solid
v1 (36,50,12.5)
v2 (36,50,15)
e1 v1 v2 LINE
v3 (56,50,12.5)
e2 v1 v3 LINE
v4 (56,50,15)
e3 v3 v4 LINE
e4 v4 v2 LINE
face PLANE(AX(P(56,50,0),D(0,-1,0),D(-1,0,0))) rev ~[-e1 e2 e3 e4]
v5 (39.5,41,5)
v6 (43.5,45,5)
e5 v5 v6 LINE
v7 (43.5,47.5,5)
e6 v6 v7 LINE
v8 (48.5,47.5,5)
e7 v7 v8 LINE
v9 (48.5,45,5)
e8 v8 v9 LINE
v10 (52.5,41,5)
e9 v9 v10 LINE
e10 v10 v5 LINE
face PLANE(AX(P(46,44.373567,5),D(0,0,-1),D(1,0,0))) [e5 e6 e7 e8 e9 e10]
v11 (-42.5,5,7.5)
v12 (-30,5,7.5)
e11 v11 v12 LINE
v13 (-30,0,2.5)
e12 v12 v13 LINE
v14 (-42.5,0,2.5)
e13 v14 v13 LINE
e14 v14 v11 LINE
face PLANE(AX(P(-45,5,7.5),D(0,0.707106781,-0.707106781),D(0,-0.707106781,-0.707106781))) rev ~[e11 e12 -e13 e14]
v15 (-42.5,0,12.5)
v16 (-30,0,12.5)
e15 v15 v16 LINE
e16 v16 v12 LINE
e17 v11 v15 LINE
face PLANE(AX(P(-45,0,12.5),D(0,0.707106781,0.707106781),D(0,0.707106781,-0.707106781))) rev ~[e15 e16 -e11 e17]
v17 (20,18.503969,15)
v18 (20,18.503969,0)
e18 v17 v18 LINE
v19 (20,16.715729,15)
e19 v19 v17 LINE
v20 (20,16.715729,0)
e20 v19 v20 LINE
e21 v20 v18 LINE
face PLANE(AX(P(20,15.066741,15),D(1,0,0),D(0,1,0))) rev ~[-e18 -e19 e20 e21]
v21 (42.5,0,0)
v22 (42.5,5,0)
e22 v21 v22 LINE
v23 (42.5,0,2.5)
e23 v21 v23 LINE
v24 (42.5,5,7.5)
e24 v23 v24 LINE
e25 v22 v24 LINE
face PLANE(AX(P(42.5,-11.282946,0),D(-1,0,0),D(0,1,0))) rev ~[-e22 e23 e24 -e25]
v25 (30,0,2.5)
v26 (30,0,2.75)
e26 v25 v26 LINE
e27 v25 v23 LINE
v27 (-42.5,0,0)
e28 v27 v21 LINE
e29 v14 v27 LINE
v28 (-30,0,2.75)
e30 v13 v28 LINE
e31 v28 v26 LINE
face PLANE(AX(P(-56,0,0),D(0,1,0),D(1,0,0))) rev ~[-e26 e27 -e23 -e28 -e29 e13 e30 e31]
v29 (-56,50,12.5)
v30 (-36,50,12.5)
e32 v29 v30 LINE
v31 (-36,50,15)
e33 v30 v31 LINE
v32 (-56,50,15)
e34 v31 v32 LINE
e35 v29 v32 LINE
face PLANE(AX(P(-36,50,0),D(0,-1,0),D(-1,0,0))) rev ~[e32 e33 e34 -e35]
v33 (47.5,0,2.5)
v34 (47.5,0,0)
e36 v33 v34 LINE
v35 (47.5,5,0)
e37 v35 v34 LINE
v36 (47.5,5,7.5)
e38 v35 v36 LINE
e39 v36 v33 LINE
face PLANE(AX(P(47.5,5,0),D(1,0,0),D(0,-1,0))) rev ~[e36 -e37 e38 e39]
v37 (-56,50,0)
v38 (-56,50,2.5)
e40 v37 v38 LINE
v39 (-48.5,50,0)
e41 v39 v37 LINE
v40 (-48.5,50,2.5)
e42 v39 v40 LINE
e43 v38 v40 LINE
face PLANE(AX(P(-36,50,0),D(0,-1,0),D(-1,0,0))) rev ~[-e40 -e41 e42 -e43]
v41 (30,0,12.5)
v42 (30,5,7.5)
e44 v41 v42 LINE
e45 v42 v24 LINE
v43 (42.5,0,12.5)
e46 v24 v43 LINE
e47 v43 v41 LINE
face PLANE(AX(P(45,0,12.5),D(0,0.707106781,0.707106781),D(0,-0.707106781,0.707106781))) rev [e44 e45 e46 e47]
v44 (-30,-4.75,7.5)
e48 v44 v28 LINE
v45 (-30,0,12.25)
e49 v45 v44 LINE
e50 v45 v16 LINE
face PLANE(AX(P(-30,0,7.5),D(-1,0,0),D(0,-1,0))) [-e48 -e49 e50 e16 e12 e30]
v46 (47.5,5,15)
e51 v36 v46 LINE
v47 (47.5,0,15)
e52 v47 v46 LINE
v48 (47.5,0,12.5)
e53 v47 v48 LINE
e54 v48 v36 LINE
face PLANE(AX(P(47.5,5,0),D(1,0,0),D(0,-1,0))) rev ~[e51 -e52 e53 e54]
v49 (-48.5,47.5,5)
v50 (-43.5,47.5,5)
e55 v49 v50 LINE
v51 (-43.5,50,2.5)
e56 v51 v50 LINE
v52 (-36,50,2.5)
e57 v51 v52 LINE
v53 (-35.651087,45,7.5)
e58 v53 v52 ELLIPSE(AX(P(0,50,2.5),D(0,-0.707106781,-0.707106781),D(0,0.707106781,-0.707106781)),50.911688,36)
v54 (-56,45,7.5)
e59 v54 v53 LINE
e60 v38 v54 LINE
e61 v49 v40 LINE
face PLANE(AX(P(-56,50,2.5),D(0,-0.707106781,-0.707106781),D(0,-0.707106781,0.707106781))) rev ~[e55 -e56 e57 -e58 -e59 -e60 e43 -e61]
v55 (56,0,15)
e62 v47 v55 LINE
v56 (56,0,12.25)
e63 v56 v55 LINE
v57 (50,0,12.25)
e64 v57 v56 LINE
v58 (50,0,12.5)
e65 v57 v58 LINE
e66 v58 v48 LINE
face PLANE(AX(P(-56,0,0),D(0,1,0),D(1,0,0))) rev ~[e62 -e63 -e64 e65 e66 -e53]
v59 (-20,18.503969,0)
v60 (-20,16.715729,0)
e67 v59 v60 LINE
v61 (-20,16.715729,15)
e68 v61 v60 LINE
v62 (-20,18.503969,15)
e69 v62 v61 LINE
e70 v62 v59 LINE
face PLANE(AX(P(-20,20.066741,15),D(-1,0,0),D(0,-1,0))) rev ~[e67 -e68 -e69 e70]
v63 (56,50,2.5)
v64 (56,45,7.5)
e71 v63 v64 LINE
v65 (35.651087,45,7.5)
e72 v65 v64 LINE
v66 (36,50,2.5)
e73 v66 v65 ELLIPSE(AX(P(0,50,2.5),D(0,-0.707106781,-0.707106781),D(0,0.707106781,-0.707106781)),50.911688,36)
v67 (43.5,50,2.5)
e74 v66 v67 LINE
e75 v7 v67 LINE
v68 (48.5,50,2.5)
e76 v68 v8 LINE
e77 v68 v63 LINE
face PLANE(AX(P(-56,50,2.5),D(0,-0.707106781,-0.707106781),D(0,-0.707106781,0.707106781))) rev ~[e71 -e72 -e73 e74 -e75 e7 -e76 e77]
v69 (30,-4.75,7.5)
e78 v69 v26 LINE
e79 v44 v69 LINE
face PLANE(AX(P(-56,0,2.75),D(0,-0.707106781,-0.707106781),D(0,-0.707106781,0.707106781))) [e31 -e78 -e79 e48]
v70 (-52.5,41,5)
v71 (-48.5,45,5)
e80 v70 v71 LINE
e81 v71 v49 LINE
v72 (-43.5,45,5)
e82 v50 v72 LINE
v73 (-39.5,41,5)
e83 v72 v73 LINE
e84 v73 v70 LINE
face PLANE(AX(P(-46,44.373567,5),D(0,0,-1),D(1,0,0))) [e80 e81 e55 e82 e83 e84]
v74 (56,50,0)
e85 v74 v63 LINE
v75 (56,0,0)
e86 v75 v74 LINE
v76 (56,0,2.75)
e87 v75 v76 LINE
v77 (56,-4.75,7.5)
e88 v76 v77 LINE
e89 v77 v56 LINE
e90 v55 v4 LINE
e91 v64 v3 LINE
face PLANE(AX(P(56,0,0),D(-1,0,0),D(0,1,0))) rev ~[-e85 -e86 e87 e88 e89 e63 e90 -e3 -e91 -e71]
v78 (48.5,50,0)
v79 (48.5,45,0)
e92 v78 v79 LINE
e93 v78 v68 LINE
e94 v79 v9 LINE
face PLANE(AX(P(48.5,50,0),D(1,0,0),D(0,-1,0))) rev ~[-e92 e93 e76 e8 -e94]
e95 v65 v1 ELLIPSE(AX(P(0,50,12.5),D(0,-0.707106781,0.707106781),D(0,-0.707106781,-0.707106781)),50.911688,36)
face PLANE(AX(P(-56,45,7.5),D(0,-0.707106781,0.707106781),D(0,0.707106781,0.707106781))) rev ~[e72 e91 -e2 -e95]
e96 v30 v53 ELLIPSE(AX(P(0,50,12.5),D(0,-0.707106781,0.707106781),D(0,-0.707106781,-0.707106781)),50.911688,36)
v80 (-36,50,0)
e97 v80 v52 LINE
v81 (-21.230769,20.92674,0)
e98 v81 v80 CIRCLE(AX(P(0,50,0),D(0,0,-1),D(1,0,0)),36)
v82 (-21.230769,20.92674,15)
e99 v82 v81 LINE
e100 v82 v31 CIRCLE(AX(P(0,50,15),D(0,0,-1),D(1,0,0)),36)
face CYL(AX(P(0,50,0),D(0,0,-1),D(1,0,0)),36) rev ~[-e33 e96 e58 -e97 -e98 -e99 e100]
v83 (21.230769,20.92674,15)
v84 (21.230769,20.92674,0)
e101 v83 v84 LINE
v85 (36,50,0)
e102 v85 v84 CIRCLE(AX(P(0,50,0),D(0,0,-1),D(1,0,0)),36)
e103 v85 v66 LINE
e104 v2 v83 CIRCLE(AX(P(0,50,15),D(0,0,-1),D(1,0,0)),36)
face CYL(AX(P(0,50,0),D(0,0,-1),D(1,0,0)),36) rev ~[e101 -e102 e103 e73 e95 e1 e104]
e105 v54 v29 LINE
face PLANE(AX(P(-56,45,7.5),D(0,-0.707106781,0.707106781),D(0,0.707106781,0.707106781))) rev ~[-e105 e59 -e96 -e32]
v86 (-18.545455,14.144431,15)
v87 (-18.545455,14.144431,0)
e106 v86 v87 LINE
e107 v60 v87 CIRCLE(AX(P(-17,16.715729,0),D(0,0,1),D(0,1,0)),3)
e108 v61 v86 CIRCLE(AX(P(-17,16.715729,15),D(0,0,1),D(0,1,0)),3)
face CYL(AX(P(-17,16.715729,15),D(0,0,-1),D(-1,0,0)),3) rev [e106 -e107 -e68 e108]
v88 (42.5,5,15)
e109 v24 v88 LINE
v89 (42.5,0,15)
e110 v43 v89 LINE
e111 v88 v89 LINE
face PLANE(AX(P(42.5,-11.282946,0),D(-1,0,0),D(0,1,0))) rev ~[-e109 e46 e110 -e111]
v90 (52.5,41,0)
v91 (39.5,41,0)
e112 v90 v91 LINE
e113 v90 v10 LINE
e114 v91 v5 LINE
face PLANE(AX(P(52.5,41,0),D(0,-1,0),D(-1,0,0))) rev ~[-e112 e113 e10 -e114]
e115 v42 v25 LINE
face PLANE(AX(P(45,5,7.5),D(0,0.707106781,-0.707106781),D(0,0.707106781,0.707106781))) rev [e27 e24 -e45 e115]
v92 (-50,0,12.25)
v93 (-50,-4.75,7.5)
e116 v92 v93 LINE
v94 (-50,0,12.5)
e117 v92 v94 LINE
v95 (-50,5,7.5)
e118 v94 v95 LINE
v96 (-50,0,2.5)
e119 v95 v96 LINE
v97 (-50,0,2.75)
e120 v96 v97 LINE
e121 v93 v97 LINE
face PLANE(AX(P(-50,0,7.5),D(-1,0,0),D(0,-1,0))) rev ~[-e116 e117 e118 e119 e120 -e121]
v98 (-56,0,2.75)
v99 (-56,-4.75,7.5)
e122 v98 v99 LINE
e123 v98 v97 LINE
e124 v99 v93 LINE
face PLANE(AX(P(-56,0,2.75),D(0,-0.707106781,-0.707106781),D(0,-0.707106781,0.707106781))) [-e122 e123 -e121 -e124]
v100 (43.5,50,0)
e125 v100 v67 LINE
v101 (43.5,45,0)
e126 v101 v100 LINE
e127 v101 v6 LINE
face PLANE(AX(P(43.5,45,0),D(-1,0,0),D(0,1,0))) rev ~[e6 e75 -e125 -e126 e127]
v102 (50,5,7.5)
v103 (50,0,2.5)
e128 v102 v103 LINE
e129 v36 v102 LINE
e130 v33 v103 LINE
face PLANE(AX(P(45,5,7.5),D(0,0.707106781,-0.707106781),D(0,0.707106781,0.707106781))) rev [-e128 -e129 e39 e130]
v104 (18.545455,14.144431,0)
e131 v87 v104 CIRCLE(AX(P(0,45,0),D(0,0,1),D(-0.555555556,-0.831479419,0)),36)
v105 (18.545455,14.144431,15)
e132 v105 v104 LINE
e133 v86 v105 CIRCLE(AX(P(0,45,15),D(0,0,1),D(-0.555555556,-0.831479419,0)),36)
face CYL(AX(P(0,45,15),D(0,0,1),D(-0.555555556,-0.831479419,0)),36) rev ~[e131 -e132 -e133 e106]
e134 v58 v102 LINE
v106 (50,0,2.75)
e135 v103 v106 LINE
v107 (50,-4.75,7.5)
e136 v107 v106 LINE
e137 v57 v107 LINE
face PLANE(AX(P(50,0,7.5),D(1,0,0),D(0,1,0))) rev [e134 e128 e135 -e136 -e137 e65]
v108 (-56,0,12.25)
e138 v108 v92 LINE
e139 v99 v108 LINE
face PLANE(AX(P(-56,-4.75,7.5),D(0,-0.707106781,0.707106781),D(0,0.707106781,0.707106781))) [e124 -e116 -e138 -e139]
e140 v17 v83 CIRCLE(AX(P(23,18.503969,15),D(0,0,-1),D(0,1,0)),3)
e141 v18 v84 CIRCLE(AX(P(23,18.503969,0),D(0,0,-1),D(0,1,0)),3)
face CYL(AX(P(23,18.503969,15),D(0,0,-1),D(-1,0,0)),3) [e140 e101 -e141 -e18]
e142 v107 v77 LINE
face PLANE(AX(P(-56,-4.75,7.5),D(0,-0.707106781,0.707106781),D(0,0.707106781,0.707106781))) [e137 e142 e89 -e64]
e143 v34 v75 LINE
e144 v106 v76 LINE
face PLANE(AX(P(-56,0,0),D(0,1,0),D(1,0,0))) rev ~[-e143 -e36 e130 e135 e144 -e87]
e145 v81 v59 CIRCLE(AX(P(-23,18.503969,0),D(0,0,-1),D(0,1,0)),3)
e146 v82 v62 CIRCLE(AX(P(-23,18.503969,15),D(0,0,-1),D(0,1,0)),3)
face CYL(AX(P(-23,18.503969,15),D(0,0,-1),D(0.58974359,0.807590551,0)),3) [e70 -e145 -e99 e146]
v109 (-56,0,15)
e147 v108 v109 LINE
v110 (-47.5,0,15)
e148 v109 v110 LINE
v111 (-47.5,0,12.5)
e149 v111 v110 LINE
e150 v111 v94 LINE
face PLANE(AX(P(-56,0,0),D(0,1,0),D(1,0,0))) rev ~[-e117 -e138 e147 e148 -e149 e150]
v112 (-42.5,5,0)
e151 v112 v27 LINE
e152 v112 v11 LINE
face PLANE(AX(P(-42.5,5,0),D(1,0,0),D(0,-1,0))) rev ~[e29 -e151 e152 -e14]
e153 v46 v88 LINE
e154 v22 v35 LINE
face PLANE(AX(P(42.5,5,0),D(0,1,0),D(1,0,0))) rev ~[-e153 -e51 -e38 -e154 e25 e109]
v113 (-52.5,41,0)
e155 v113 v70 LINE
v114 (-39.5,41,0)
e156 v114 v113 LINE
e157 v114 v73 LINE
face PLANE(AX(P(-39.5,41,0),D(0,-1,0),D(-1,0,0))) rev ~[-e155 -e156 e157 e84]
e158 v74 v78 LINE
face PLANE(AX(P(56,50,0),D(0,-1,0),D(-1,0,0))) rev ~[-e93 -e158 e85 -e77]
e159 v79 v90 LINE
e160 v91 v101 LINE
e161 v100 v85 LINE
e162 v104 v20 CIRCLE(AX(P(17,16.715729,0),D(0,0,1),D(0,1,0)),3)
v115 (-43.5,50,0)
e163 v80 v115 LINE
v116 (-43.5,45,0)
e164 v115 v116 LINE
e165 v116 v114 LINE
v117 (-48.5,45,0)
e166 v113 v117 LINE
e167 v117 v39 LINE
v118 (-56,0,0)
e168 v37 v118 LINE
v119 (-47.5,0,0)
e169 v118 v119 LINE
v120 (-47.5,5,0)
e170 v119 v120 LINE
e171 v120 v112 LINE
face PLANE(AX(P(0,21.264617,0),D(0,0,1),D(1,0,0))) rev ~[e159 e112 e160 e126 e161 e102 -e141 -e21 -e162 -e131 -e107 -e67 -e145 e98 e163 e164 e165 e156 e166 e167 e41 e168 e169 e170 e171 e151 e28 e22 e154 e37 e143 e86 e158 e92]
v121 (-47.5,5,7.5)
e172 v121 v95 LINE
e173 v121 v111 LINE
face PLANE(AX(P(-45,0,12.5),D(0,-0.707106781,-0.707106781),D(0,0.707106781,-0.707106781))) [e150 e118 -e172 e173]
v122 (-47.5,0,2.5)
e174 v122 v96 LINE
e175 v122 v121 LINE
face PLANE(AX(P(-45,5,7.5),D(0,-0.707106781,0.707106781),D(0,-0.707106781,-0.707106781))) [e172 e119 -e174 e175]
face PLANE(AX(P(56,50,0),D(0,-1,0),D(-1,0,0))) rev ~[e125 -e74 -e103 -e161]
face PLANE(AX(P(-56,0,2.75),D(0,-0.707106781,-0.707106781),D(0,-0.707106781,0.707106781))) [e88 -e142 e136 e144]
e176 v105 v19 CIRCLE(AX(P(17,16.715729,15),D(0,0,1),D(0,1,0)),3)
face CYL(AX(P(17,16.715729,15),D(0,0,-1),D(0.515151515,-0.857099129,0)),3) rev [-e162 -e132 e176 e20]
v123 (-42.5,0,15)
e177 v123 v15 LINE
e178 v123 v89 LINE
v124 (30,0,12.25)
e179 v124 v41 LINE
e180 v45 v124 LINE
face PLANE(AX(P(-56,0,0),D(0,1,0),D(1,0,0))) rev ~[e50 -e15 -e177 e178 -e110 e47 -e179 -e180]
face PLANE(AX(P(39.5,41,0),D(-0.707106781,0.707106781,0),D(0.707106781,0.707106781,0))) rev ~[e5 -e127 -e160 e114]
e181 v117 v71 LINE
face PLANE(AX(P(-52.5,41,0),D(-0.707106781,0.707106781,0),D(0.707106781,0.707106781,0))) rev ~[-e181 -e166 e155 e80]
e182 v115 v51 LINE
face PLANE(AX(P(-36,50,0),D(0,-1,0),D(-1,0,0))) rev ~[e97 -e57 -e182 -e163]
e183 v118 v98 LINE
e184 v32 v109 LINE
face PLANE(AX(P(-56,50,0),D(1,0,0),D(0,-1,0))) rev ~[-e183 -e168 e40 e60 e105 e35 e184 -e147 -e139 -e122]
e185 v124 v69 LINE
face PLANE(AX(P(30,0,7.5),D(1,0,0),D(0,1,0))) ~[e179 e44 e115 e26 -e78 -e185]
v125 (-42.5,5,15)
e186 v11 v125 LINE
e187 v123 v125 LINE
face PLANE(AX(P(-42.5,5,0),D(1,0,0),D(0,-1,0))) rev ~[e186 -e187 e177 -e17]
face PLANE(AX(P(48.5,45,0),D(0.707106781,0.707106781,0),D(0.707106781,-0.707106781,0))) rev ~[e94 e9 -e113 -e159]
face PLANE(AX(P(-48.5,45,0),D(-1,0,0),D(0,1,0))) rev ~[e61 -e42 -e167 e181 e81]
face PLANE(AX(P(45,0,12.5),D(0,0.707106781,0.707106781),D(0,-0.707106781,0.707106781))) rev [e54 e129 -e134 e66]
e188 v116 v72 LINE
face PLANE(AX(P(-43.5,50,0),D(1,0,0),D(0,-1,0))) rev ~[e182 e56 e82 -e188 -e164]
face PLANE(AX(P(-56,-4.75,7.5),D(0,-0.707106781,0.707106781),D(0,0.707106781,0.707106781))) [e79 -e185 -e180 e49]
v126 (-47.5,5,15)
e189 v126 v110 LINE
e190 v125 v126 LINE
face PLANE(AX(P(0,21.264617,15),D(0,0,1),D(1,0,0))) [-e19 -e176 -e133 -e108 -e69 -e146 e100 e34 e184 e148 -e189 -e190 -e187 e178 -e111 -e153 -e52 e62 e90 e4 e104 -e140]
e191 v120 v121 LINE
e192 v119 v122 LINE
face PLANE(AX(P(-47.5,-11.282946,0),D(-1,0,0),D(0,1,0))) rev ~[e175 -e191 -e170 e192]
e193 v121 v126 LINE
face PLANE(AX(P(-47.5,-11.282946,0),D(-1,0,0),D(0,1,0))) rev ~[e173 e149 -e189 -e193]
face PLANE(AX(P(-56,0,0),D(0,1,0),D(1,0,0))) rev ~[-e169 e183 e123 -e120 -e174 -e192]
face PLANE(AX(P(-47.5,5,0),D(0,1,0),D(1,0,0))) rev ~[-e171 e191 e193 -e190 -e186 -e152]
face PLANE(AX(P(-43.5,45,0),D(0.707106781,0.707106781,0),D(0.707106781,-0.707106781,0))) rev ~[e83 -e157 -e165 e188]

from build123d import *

# Parameters (mm, degrees)
F1_DEPTH       = 15
F3_DEPTH       = 112.001
F5_DEPTH       = 5
F7_DEPTH       = 112
F9_DEPTH       = 25
F12_DEPTH      = 15
F12_DEPTH_BACK = 5
F14_DEPTH      = 25
F15_R          = 3


# Not quite as in the source:
# - a pattern or mirror of a feature is missing from the dataset's text; its kind, count and spacing are read off the source's solid


with BuildPart() as f1:
    # F0 (on Top) → F1 (new body)
    with BuildSketch(Plane.XY):
        with BuildLine():
            Line((-56, 50), (-56, 0))
            Line((-56, 0), (56, 0))
            Line((56, 0), (56, 50))
            Line((56, 50), (36, 50))
            ThreePointArc((36, 50), (0, 14), (-36, 50))
            Line((-36, 50), (-56, 50))
        make_face()
    extrude(amount=F1_DEPTH)

    # F2 (on face) → F3 (cut, through all)
    with BuildSketch(Plane(origin=(-56, 0, 0), x_dir=(0, -1, 0), z_dir=(-1, 0, 0))):
        Polygon((-50, 12.5), (-50, 2.5), (-45, 7.5), align=None)
    extrude(amount=-F3_DEPTH, mode=Mode.SUBTRACT)

    # F4 (on face) → F5 (cut)
    with BuildSketch(Plane(origin=(0, 0, 0), x_dir=(1, 0, 0), z_dir=(0, 0, -1))):
        Polygon((-48.5, -45), (-48.5, -50), (-43.5, -50), (-43.5, -45), (-39.5, -41), (-52.5, -41), align=None)
        Polygon((43.5, -45), (43.5, -50), (48.5, -50), (48.5, -45), (52.5, -41), (39.5, -41), align=None)
    extrude(amount=-F5_DEPTH, mode=Mode.SUBTRACT)

    # F6 (on face) → F7 (join, through all)
    with BuildSketch(Plane(origin=(-56, 0, 0), x_dir=(0, -1, 0), z_dir=(-1, 0, 0))):
        Polygon((4.75, 7.5), (0, 12.25), (0, 2.75), align=None)
    extrude(amount=-F7_DEPTH)

    # F8 (on face) → F9 (cut)
    with BuildSketch(Plane(origin=(0, 0, 0), x_dir=(1, 0, 0), z_dir=(0, 0, -1))):
        Polygon((-47.5, 11.2829459831), (-47.5, 0), (-47.5, -5), (-42.5, -5), (-42.5, 0), (-42.5, 11.2829459831), align=None)
        Polygon((47.5, 11.2829459831), (42.5, 11.2829459831), (42.5, 0), (42.5, -5), (47.5, -5), (47.5, 0), align=None)
    extrude(amount=-F9_DEPTH, mode=Mode.SUBTRACT)

    # F11 (on mid) → F12 (cut, two sides)
    with BuildSketch(Plane(origin=(-45, 0, 0), x_dir=(0, -1, 0), z_dir=(-1, 0, 0))) as f12_sk:
        Polygon((0, 12.5), (-5, 7.5), (0, 2.5), (5, 7.5), align=None)
    f12 = extrude(amount=-F12_DEPTH, mode=Mode.SUBTRACT) + extrude(f12_sk.sketch, amount=F12_DEPTH_BACK, mode=Mode.SUBTRACT)

    # F12_copies: F12 across plane
    add(f12.mirror(Plane(origin=(0, 0, 0), x_dir=(0, 0, 1), z_dir=(1, 0, 0))), mode=Mode.SUBTRACT)

    # F13 (on face) → F14 (cut)
    with BuildSketch(Plane.XY.offset(15)):
        with BuildLine():
            Line((20, 15.0667409058), (20, 20.0667409058))
            ThreePointArc((20, 20.0667409058), (0, 14), (-20, 20.0667409058))
            Line((-20, 20.0667409058), (-20, 15.0667409058))
            ThreePointArc((-20, 15.0667409058), (0, 9), (20, 15.0667409058))
        make_face()
    extrude(amount=-F14_DEPTH, mode=Mode.SUBTRACT)

    # F15
    f15_edges = [f1.edges().sort_by_distance(p)[0] for p in [
        (-20, 20.066741, 7.5),
        (20, 20.066741, 7.5),
        (-20, 15.066741, 7.5),
        (20, 15.066741, 7.5),
    ]]
    fillet(f15_edges, radius=F15_R)


solid = f1.part
